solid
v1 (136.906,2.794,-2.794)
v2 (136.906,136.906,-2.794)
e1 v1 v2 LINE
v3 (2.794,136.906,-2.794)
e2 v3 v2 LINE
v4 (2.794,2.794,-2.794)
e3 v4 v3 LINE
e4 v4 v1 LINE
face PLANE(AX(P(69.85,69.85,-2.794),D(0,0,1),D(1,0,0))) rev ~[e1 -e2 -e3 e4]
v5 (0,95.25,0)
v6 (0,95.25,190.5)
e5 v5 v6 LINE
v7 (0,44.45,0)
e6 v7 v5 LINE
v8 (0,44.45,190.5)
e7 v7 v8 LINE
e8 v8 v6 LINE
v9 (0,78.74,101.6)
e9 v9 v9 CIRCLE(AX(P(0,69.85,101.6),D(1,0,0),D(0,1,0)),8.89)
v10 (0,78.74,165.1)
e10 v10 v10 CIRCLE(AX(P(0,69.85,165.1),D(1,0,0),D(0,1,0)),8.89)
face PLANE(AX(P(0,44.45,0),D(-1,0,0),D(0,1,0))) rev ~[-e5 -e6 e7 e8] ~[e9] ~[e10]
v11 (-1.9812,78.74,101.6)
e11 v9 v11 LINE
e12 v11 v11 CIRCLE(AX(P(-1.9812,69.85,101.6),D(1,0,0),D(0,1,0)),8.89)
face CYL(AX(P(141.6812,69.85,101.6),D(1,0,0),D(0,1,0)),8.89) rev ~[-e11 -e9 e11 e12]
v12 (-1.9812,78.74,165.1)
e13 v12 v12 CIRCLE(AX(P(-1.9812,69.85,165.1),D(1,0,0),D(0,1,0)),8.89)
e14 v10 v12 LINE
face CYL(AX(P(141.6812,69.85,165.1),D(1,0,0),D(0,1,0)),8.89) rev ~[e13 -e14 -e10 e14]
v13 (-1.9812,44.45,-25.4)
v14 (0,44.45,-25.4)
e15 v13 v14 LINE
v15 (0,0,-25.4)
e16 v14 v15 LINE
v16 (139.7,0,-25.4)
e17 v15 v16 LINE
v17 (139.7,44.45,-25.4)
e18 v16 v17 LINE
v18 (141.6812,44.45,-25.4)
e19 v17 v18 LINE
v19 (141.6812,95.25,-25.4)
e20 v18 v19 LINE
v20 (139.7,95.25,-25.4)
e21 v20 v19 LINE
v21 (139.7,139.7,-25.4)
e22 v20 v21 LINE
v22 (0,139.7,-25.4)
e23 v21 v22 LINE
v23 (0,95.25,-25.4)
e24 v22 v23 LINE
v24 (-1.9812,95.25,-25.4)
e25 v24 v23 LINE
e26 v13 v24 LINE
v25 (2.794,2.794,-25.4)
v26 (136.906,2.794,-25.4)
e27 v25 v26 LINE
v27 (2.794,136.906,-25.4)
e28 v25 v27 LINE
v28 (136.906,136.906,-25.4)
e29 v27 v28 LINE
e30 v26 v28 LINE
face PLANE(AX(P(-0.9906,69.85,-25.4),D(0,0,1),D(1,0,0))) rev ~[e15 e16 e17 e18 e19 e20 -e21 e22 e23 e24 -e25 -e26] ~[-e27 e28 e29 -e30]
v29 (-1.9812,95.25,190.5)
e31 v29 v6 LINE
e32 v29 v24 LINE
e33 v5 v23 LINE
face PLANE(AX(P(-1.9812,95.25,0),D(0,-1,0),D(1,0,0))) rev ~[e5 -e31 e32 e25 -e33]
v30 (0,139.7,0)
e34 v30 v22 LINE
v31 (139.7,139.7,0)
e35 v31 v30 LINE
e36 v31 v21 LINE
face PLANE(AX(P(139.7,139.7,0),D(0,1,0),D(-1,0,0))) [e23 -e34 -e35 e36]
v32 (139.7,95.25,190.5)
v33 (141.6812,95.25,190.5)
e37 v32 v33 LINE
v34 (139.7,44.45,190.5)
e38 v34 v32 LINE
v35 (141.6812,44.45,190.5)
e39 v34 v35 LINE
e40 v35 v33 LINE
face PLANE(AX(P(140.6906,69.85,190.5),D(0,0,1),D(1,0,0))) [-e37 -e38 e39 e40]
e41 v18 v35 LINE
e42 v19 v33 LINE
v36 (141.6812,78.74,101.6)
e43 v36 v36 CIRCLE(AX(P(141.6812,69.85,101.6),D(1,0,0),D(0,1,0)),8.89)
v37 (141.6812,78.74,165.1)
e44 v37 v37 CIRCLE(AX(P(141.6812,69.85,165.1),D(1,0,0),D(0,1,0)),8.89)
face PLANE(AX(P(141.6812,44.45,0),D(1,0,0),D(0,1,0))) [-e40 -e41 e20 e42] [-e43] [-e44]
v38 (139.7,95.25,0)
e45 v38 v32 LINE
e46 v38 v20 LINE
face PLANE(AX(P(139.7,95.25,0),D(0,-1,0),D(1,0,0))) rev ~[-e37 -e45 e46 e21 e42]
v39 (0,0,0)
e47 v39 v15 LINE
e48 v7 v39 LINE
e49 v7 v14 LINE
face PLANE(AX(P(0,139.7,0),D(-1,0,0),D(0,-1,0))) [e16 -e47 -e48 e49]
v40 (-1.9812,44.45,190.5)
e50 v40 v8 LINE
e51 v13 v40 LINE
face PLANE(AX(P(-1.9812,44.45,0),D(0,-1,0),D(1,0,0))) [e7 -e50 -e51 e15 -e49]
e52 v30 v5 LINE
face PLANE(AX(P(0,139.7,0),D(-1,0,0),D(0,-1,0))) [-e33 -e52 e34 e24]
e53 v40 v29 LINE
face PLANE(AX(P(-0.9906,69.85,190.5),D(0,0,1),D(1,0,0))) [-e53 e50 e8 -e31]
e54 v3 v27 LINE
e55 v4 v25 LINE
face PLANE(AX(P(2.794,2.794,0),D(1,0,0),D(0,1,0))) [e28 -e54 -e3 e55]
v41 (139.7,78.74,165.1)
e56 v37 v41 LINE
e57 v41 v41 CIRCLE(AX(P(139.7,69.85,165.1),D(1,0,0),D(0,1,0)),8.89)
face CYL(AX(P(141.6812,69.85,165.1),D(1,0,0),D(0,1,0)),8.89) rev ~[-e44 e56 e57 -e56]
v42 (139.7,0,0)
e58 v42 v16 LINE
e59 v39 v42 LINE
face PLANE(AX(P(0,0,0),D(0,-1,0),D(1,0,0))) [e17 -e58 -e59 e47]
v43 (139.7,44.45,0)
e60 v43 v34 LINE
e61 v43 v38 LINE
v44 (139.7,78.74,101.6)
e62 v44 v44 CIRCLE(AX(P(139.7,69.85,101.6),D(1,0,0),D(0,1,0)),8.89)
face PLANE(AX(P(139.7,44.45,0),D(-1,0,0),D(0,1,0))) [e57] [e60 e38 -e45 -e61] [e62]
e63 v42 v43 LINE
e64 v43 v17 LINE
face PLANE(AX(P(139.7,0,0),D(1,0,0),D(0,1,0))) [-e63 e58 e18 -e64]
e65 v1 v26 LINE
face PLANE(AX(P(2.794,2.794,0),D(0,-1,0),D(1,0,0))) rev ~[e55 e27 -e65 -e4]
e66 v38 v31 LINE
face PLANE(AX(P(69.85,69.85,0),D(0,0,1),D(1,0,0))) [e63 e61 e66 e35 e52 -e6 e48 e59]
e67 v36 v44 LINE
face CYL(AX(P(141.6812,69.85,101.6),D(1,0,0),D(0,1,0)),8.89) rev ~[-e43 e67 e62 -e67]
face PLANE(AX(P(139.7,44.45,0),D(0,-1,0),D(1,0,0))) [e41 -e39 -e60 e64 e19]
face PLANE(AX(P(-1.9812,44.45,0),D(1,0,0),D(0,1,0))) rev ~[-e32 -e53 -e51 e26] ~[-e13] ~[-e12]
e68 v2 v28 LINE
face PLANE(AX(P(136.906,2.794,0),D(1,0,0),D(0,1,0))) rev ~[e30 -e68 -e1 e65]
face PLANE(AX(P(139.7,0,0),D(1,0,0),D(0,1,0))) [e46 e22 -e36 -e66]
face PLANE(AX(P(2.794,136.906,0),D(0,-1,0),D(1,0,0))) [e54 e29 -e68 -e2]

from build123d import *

# Parameters (mm, degrees)
F0_W     = 134.112
F0_H     = 134.112
F1_DEPTH = 25.4
F2_DEPTH = 2.794
F0_W_2   = 1.9812
F0_H_2   = 50.8
F3_DEPTH = 190.5
F4_DEPTH = 25.4
F5_R     = 8.89
F6_DEPTH = 143.6634


# Not quite as in the source:
# - a feature of the source that left no trace in its solid (it failed there, or was rolled back) is left out


with BuildPart() as f1:
    # F0 (on Top) → F1 (new body)
    with BuildSketch(Plane.XY):
        Polygon((0, 44.45), (0, 0), (139.7, 0), (139.7, 44.45), (139.7, 95.25), (139.7, 139.7), (0, 139.7), (0, 95.25), align=None)
        with Locations((69.85, 69.85)):
            Rectangle(F0_W, F0_H, mode=Mode.SUBTRACT)
    extrude(amount=-F1_DEPTH)

    # F0 (on Top) → F2 (join)
    with BuildSketch(Plane.XY):
        with Locations((69.85, 69.85)):
            Rectangle(F0_W, F0_H)
    extrude(amount=-F2_DEPTH)

    # F0 (on Top) → F3 (join)
    with BuildSketch(Plane.XY):
        with Locations((-0.9906, 69.85)):
            Rectangle(F0_W_2, F0_H_2)
        with Locations((140.6906, 69.85)):
            Rectangle(F0_W_2, F0_H_2)
    extrude(amount=F3_DEPTH)

    # F0 (on Top) → F4 (join)
    with BuildSketch(Plane.XY):
        with Locations((-0.9906, 69.85)):
            Rectangle(F0_W_2, F0_H_2)
        with Locations((140.6906, 69.85)):
            Rectangle(F0_W_2, F0_H_2)
    extrude(amount=-F4_DEPTH)

    # F5 (on face) → F6 (cut, through all)
    with BuildSketch(Plane.YZ.offset(141.6812)):
        with Locations((69.85, 165.1)):
            Circle(F5_R)
        with Locations((69.85, 101.6)):
            Circle(F5_R)
    extrude(amount=-F6_DEPTH, mode=Mode.SUBTRACT)


solid = f1.part
